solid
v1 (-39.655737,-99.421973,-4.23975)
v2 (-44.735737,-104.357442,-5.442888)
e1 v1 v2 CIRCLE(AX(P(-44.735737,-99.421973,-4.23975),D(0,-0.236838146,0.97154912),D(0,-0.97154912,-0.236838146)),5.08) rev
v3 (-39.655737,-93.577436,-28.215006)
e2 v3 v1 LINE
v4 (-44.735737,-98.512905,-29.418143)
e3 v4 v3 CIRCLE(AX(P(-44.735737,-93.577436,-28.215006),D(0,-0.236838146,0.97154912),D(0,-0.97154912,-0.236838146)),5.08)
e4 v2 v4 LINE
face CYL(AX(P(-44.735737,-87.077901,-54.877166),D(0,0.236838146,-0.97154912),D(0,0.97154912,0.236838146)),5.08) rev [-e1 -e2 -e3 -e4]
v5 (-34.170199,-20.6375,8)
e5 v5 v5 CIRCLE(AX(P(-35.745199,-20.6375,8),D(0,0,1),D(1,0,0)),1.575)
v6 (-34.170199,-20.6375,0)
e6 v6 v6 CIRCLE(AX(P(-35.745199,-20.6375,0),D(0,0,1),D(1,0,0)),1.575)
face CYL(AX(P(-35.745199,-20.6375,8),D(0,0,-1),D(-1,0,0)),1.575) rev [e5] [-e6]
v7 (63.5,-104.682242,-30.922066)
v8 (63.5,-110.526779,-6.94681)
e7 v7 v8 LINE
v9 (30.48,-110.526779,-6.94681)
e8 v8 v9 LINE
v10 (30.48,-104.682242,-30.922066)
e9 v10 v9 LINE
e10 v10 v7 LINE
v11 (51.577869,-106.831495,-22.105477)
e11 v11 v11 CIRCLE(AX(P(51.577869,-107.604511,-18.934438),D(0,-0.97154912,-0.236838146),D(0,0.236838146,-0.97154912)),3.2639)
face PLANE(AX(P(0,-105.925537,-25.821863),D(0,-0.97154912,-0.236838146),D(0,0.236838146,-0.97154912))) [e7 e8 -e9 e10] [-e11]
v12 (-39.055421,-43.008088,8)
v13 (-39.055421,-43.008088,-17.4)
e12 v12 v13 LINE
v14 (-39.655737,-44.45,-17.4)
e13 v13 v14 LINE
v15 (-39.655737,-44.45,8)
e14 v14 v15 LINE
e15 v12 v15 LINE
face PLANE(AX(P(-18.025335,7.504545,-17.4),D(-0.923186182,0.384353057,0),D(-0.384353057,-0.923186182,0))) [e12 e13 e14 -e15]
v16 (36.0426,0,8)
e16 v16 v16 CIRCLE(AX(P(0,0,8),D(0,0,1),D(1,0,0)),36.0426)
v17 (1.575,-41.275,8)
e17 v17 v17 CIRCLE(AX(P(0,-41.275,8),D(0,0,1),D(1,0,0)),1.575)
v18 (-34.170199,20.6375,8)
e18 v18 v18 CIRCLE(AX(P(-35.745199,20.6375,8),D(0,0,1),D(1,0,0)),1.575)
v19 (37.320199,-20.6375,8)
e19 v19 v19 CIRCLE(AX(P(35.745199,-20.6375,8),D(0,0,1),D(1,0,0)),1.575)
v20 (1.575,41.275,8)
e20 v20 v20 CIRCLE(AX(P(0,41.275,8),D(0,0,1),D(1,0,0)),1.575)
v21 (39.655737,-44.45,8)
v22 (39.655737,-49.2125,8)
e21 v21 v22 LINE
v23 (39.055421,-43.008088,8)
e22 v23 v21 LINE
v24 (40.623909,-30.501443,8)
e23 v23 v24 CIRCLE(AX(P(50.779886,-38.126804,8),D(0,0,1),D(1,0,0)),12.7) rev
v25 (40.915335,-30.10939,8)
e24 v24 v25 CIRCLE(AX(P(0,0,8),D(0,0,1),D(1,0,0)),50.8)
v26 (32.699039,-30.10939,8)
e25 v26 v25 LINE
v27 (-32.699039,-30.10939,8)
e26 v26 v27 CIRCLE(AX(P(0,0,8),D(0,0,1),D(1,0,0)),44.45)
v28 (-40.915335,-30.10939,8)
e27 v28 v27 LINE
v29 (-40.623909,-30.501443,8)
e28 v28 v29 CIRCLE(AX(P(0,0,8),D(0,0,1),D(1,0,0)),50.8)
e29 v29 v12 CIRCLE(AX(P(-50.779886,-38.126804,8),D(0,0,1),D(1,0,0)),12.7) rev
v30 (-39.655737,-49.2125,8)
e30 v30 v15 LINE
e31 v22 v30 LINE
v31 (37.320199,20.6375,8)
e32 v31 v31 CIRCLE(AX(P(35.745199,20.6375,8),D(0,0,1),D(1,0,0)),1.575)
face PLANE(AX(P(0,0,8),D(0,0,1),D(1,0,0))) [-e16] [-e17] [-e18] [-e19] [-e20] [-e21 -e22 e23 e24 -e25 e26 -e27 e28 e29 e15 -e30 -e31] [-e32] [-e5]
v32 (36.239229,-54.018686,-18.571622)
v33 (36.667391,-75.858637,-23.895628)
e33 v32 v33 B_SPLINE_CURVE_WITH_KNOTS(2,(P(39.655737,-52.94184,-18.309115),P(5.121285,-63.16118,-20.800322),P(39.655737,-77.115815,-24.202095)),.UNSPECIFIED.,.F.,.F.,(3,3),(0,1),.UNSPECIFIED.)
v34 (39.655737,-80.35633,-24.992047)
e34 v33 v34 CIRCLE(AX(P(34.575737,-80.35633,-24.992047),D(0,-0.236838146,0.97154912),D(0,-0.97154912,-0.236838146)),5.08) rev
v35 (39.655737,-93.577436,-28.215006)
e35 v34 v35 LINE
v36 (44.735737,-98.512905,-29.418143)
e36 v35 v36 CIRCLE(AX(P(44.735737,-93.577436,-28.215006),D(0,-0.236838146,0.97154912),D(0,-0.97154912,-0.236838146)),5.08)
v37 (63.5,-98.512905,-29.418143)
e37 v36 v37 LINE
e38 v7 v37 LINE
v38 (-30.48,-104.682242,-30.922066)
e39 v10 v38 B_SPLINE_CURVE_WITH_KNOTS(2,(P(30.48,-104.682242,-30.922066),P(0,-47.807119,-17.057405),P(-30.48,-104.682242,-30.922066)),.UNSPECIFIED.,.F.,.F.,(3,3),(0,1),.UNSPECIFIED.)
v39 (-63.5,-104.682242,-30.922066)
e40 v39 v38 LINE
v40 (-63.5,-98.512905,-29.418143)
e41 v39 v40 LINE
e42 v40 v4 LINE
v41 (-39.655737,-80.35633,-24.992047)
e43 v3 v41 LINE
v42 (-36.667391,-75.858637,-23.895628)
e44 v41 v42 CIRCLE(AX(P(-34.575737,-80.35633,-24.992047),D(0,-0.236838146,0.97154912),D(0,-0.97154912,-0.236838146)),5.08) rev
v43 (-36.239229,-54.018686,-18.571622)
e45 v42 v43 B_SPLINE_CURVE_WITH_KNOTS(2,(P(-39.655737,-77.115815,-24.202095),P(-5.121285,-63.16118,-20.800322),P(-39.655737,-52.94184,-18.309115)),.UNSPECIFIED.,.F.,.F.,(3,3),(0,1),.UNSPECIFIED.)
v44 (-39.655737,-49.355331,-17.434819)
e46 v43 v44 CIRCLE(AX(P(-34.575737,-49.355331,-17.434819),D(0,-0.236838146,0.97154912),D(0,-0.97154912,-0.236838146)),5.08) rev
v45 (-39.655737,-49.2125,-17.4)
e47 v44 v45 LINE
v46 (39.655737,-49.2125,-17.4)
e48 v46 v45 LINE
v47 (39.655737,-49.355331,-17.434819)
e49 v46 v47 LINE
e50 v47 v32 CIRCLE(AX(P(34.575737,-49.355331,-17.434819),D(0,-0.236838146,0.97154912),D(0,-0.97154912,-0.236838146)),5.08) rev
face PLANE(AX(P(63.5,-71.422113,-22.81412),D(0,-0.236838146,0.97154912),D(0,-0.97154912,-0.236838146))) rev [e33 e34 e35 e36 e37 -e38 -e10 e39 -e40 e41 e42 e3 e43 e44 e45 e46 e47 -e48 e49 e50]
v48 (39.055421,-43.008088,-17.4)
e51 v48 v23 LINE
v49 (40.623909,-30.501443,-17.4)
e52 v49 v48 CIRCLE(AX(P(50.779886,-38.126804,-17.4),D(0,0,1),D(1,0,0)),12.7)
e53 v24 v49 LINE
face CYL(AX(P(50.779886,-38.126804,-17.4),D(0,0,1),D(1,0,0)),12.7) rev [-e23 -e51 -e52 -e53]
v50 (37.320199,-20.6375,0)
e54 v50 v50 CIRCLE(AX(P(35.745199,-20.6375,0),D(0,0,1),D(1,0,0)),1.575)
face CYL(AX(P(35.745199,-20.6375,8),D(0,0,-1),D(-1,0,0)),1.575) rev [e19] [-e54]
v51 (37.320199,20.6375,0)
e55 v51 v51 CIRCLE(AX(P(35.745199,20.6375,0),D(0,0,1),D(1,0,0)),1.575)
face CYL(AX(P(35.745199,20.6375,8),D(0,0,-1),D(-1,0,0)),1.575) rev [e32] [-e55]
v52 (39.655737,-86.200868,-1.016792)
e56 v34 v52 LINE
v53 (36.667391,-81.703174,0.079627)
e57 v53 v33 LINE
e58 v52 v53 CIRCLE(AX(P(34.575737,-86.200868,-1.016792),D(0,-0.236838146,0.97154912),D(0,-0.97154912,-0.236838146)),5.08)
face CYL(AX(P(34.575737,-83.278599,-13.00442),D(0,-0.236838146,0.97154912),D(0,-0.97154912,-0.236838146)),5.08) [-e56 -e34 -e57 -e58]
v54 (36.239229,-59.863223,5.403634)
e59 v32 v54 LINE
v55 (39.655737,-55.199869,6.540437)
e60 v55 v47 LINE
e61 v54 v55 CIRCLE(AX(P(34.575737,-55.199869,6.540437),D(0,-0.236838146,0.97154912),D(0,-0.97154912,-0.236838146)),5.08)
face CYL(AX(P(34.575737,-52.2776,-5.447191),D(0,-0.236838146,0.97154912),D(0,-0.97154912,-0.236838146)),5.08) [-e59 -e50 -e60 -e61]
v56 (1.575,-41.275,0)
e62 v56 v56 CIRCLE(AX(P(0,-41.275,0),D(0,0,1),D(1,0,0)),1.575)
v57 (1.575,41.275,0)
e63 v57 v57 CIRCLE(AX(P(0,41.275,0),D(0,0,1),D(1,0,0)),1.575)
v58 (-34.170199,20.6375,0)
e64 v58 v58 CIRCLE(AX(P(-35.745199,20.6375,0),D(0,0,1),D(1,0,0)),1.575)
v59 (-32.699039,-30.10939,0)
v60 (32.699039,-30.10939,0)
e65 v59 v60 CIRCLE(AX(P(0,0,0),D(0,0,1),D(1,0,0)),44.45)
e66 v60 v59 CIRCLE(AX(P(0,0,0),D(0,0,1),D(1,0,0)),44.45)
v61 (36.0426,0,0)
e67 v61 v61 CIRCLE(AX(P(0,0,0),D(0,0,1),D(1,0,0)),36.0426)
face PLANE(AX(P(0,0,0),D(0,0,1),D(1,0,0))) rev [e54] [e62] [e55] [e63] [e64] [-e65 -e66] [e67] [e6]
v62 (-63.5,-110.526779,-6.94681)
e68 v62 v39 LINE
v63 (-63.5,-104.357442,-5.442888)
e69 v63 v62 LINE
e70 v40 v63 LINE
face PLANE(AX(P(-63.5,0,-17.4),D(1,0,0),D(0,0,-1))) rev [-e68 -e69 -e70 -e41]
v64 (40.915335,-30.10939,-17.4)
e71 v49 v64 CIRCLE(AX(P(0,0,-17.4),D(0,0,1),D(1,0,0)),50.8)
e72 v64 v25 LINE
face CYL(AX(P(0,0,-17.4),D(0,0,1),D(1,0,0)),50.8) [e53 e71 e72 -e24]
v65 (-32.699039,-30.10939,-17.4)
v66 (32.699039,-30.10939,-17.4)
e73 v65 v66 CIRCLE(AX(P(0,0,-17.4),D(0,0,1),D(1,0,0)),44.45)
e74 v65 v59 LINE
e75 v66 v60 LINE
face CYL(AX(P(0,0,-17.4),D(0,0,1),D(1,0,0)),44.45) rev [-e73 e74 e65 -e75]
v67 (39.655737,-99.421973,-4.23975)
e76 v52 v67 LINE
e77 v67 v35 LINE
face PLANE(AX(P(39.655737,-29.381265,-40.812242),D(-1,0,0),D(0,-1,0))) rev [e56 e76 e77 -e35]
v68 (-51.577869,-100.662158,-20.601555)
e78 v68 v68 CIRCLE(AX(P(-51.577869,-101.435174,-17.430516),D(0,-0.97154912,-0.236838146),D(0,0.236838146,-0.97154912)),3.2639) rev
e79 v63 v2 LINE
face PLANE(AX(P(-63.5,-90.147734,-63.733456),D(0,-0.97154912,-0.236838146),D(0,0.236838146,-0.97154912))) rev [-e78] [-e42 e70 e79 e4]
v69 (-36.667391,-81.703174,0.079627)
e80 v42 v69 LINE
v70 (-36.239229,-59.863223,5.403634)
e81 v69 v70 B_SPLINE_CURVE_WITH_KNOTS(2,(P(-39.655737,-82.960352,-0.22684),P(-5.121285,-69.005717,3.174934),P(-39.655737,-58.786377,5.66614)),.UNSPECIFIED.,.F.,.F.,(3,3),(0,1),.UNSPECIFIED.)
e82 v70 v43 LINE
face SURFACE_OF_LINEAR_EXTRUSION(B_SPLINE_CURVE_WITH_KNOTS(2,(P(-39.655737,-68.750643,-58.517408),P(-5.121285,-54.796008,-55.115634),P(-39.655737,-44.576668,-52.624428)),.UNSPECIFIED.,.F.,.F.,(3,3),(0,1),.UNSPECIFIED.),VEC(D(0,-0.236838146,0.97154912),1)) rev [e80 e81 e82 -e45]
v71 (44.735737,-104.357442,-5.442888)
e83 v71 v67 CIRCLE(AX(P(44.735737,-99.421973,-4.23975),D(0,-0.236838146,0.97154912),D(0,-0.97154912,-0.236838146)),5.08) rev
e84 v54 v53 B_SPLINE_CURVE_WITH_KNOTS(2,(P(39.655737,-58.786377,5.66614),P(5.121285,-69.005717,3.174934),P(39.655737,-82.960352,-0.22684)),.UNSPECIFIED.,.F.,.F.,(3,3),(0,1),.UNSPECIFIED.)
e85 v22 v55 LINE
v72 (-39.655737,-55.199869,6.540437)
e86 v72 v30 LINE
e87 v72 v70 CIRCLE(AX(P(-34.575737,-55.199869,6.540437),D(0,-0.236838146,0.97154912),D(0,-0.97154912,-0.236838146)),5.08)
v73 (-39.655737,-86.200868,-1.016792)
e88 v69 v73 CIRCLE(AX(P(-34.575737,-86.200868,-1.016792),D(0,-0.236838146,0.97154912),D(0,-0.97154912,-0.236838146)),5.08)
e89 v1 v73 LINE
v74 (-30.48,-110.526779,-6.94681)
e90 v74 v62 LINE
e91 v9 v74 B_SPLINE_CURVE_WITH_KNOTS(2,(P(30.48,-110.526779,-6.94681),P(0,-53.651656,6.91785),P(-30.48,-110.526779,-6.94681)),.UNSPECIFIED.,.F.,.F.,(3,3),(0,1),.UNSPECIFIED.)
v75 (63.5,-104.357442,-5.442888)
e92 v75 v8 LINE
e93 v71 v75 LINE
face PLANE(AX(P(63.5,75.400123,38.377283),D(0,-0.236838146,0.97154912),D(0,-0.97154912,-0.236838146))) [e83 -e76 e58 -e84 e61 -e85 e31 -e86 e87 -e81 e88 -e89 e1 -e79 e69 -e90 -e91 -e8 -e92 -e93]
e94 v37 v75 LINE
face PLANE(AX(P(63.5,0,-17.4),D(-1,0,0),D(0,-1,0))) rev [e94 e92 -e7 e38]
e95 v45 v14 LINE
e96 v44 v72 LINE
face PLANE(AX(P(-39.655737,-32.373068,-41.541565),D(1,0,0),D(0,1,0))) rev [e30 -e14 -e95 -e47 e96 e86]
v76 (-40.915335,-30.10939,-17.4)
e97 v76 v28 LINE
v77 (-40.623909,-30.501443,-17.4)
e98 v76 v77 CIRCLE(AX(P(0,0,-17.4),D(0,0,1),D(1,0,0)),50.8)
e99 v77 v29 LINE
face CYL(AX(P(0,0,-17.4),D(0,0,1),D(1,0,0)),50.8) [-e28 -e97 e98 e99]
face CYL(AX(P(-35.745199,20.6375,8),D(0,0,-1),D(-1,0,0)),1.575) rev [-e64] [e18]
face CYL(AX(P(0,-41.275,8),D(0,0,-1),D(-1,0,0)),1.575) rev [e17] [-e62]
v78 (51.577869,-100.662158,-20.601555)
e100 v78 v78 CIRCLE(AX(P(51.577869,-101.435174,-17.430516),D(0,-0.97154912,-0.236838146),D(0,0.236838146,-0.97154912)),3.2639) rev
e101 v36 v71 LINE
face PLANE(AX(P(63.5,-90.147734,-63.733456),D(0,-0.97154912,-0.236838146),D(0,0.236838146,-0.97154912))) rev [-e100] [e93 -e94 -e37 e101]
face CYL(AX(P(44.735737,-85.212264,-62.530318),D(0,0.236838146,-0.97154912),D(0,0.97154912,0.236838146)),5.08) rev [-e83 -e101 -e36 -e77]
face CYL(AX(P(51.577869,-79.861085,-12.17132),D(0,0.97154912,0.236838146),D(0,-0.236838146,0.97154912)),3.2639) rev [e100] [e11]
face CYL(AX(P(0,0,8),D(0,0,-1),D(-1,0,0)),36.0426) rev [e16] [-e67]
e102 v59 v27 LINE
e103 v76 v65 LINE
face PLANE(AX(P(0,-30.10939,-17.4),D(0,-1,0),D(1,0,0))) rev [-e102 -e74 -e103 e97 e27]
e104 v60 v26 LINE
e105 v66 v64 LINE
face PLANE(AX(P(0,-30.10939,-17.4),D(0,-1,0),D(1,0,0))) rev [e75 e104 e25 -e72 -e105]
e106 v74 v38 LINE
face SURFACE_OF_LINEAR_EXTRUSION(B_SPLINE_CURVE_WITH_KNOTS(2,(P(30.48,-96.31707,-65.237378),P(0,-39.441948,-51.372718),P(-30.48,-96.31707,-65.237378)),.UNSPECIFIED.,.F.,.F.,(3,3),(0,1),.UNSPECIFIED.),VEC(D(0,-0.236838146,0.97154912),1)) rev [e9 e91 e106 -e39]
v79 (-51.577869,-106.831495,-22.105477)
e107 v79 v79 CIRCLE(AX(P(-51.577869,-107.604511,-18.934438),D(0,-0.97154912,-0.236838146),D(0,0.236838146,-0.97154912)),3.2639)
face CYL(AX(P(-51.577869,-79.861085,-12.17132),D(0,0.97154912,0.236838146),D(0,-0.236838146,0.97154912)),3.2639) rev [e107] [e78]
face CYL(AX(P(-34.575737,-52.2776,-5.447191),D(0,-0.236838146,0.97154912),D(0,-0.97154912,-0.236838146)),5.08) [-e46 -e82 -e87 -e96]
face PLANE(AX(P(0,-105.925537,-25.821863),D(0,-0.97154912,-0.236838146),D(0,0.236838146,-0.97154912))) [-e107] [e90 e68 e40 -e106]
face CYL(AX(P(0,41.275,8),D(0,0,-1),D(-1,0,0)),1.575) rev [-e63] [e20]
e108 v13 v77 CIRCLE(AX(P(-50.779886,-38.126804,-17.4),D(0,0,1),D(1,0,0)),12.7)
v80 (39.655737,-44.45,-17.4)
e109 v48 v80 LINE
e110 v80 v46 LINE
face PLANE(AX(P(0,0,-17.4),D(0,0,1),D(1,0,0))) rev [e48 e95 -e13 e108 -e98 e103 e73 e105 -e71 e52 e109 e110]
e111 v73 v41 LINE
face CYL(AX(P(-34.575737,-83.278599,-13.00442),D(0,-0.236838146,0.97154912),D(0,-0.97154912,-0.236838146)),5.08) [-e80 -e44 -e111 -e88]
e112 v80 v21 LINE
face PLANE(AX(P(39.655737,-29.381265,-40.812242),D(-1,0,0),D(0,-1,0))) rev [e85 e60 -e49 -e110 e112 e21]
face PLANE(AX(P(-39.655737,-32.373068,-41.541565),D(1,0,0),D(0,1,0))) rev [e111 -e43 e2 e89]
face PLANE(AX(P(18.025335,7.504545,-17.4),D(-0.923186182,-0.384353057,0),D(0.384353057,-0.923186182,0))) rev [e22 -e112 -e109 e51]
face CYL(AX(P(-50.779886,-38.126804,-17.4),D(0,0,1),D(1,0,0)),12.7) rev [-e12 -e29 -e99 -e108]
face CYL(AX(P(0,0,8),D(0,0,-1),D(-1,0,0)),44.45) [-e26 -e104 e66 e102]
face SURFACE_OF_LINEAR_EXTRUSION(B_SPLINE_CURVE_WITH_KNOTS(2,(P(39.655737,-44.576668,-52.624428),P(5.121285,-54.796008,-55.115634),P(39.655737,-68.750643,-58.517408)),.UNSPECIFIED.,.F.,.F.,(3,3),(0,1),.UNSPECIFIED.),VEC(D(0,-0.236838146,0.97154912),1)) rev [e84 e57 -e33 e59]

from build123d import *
from build123d.topology import SkipClean

# Parameters (mm, degrees)
SKETCH1_R                       = 44.45
SKETCH1_R_2                     = 36.0426
SKETCH1_R_3                     = 1.575
BOSS_EXTRUDE1_DEPTH             = 8
BOSS_EXTRUDE2_START             = -25.4
BOSS_EXTRUDE2_DEPTH             = 25.4
SKETCH5_W                       = 127
SKETCH5_H                       = 24.677347648
BOSS_EXTRUDE3_DEPTH             = 22.86
BOSS_EXTRUDE3_DIRECTION_2_REACH = 117.98
CUT_EXTRUDE1_DEPTH              = 103.517532245
CUT_EXTRUDE2_DEPTH              = 106.121352295
SKETCH8_R                       = 3.2639
CUT_EXTRUDE3_DEPTH              = 132.797554186
SKETCH10_W                      = 23.84426271
SKETCH10_H                      = 24.677347648
SKETCH10_R                      = 3.2639
BOSS_EXTRUDE4_DEPTH             = 34.23412
FILLET3_START                   = -19.427790223
FILLET3_DEPTH                   = 24.677347648
FILLET4_R                       = 12.7
SKETCH11_W                      = 23.84426271
SKETCH11_H                      = 32.29864
CUT_EXTRUDE4_DEPTH              = 134.162391299
BOSS_EXTRUDE5_DEPTH             = 24.677347648
FILLET5_R                       = 5.08
CUT_EXTRUDE5_DEPTH              = 134.162391299
CUT_EXTRUDE6_DEPTH              = 134.162391464
FILLET6_START                   = -20
FILLET6_DEPTH                   = 26.377499095


with BuildPart() as part:
    # Sketch1 → Boss-Extrude1 (new body)
    with BuildSketch(Plane.XY):
        Circle(SKETCH1_R)
        Circle(SKETCH1_R_2, mode=Mode.SUBTRACT)
        with Locations((35.745198541, 20.6375)):
            Circle(SKETCH1_R_3, mode=Mode.SUBTRACT)
        with Locations((0, 41.275)):
            Circle(SKETCH1_R_3, mode=Mode.SUBTRACT)
        with Locations((-35.745198541, 20.6375)):
            Circle(SKETCH1_R_3, mode=Mode.SUBTRACT)
        with Locations((-35.745198541, -20.6375)):
            Circle(SKETCH1_R_3, mode=Mode.SUBTRACT)
        with Locations((0, -41.275)):
            Circle(SKETCH1_R_3, mode=Mode.SUBTRACT)
        with Locations((35.745198541, -20.6375)):
            Circle(SKETCH1_R_3, mode=Mode.SUBTRACT)
    extrude(amount=BOSS_EXTRUDE1_DEPTH)

    # Sketch4 → Boss-Extrude2 (add)
    with BuildSketch(Plane.XY.offset(8).offset(BOSS_EXTRUDE2_START)):
        with BuildLine():
            Line((-39.65573729, -44.45), (-63.5, -44.45))
            Line((-63.5, -44.45), (-63.5, -49.2125))
            Line((-63.5, -49.2125), (63.5, -49.2125))
            Line((63.5, -49.2125), (63.5, -44.45))
            Line((63.5, -44.45), (39.65573729, -44.45))
            Line((39.65573729, -44.45), (36.050670263, -35.790909091))
            ThreePointArc((36.050670263, -35.790909091), (38.587710733, -33.039802972), (40.915335308, -30.10938951))
            Line((40.915335308, -30.10938951), (32.699039181, -30.10938951))
            ThreePointArc((32.699039181, -30.10938951), (0, -44.45), (-32.699039181, -30.10938951))
            Line((-32.699039181, -30.10938951), (-40.915335308, -30.10938951))
            ThreePointArc((-40.915335308, -30.10938951), (-38.587710733, -33.039802972), (-36.050670263, -35.790909091))
            Line((-36.050670263, -35.790909091), (-39.65573729, -44.45))
        make_face()
    extrude(amount=BOSS_EXTRUDE2_DEPTH)

    # Sketch5 → Boss-Extrude3 (add)
    with BuildSketch(Plane(origin=(0, -50.455795448, -12.299797104), x_dir=(-1, 0, 0), z_dir=(0, -0.971549119997646, -0.2368381460656192))):
        with Locations((0, -7.089116399)):
            Rectangle(SKETCH5_W, SKETCH5_H)
    extrude(amount=BOSS_EXTRUDE3_DEPTH)

    # Boss-Extrude3 direction 2: up to this face of the body (flat: up to its plane)
    boss_extrude3_direction_2_end = Plane(part.part.faces().sort_by_distance((0, -49.2125, -4.7))[0])
    # Sketch5 → Boss-Extrude3 direction 2 (add, up to the picked face)
    with BuildSketch(Plane(origin=(0, -50.455795448, -12.299797104), x_dir=(-1, 0, 0), z_dir=(0, -0.971549119997646, -0.2368381460656192)), mode=Mode.PRIVATE) as boss_extrude3_direction_2_sk1:
        with Locations((0, -7.089116399)):
            Rectangle(SKETCH5_W, SKETCH5_H)
    boss_extrude3_direction_2_tool1 = split(extrude(boss_extrude3_direction_2_sk1.sketch, amount=-BOSS_EXTRUDE3_DIRECTION_2_REACH, mode=Mode.PRIVATE), bisect_by=boss_extrude3_direction_2_end, keep=Keep.BOTH, mode=Mode.PRIVATE)
    add(boss_extrude3_direction_2_tool1.solids().sort_by(Axis((0, -52.134769, -5.412372), (0, 0.971549119997646, 0.2368381460656192)))[0])

    # Sketch6 → Cut-Extrude1 (cut, through all)
    with BuildSketch(Plane(origin=(0, 1.243295448, -5.100202896), x_dir=(-1, 0, 0), z_dir=(0, 0.23683814606561915, -0.971549119997646))):
        with BuildLine():
            Line((-39.65573729, -74.793344809), (-39.65573729, -84.912644386))
            Line((-39.65573729, -84.912644386), (39.65573729, -84.912644386))
            Line((39.65573729, -84.912644386), (39.65573729, -74.793344809))
            add(Edge.make_bspline(
                [(-39.65573729, -74.793344809), (0, -52.373165884), (39.65573729, -74.793344809)],
                knots=[0, 0, 0, 1, 1, 1], degree=2))
        make_face()
    extrude(amount=-CUT_EXTRUDE1_DEPTH, mode=Mode.SUBTRACT)

    # Sketch7 → Cut-Extrude2 (cut, through all)
    with BuildSketch(Plane(origin=(0, -4.601241819, 18.875052495), x_dir=(1, 0, 0), z_dir=(0, -0.23683814606561915, 0.971549119997646))):
        Polygon((-39.65573729, -41.290653215), (-39.65573729, -70.378824809), (-63.5, -70.378824809), (-63.5, -38.21123826), (-39.65573729, -38.21123826), align=None)
        Polygon((39.65573729, -70.378824809), (63.5, -70.378824809), (63.5, -38.21123826), (39.65573729, -38.21123826), (39.65573729, -41.290653215), align=None)
    extrude(amount=-CUT_EXTRUDE2_DEPTH, mode=Mode.SUBTRACT)

    # Sketch8 → Cut-Extrude3 (cut, through all)
    with BuildSketch(Plane(origin=(0, -68.37648531, -16.66839039), x_dir=(1, 0, 0), z_dir=(0, 0.971549119997646, 0.2368381460656191))):
        with Locations(Location((51.577868645, -7.089116399, 0), (0, 0, 270))):
            Circle(SKETCH8_R)
        with Locations(Location((-51.577868645, -7.089116399, 0), (0, 0, 270))):
            Circle(SKETCH8_R)
    extrude(amount=-CUT_EXTRUDE3_DEPTH, mode=Mode.SUBTRACT)

    # Sketch10 → Boss-Extrude4 (add)
    # profile 1 of 2: a face of its own
    with SkipClean():  # the faces are left unmerged after this step: merging them gives an invalid solid
        with BuildSketch(Plane(origin=(0, -72.665408331, -17.713917123), x_dir=(1, 0, 0), z_dir=(0, -0.9715491199976461, -0.23683814606561926))):
            with Locations((-51.577868645, 7.089116399)):
                Rectangle(SKETCH10_W, SKETCH10_H)
            with Locations(Location((-51.577868645, 7.089116399, 0), (0, 0, 270))):
                Circle(SKETCH10_R, mode=Mode.SUBTRACT)
        # profile 2 of 2: a face of its own
        with BuildSketch(Plane(origin=(0, -72.665408331, -17.713917123), x_dir=(1, 0, 0), z_dir=(0, -0.9715491199976461, -0.23683814606561926))):
            with Locations((51.577868645, 7.089116399)):
                Rectangle(SKETCH10_W, SKETCH10_H)
            with Locations(Location((51.577868645, 7.089116399, 0), (0, 0, 90))):
                Circle(SKETCH10_R, mode=Mode.SUBTRACT)
        extrude(amount=BOSS_EXTRUDE4_DEPTH)
    add(part.part.scale(1), mode=Mode.REPLACE)  # the faces are merged on a copy

    # Fillet3: read off the stored shape, not the designer's step
    # Fillet3 outline → Fillet3 (add)
    with SkipClean():  # the faces are left unmerged after this step: merging them gives an invalid solid
        with BuildSketch(Plane(origin=(0, 0, 0), x_dir=(1, 0, 0), z_dir=(0, 0.23683814606561904, -0.9715491199976461)).offset(FILLET3_START)):
            with BuildLine():
                ThreePointArc((0, 75.867019335), (-23.207224812, 88.40595558), (-39.65573729, 109.027464809))
                Line((-39.65573729, 109.027464809), (-39.65573729, 74.793344809))
                add(Edge.make_bspline(
                    [(39.65573729, 74.793344809), (0, 52.373165884), (-39.65573729, 74.793344809)],
                    knots=[0, 0, 0, 1, 1, 1], degree=2))
                Line((39.65573729, 74.793344809), (39.65573729, 109.027464809))
                ThreePointArc((39.65573729, 109.027464809), (23.207224812, 88.40595558), (0, 75.867019335))
            make_face()
        extrude(amount=FILLET3_DEPTH)

    # Fillet4
    fillet4_edges = [part.edges().sort_by_distance(p)[0] for p in [
        (36.050670263, -35.790909091, -4.7),
        (-36.050670263, -35.790909091, -4.7),
    ]]
    fillet(fillet4_edges, radius=FILLET4_R)

    # Sketch11 → Cut-Extrude4 (cut, through all)
    with BuildSketch(Plane(origin=(0, -4.601241819, 18.875052495), x_dir=(1, 0, 0), z_dir=(0, -0.2368381460656192, 0.9715491199976461))):
        with Locations((-51.577868645, -86.528144809)):
            Rectangle(SKETCH11_W, SKETCH11_H)
        with Locations((51.577868645, -86.528144809)):
            Rectangle(SKETCH11_W, SKETCH11_H)
    extrude(amount=-CUT_EXTRUDE4_DEPTH, mode=Mode.SUBTRACT)

    # Sketch12 → Boss-Extrude5 (add)
    with BuildSketch(Plane(origin=(0, -4.601241819, 18.875052495), x_dir=(1, 0, 0), z_dir=(0, -0.2368381460656192, 0.9715491199976461))):
        Polygon((-39.65573729, -109.027464809), (39.65573729, -109.027464809), (30.485915065, -74.825591671), (-33.624171028, -74.825591671), align=None)
    extrude(amount=-BOSS_EXTRUDE5_DEPTH)

    # Fillet5
    fillet5_edges = [part.edges().sort_by_distance(p)[0] for p in [
        (-39.65573729, -101.435173764, -17.430515609),
        (39.65573729, -101.435173764, -17.430515609),
    ]]
    fillet(fillet5_edges, radius=FILLET5_R)

    # Sketch13 → Cut-Extrude5 (cut, through all)
    with BuildSketch(Plane(origin=(0, -4.601241819, 18.875052495), x_dir=(1, 0, 0), z_dir=(0, -0.2368381460656192, 0.9715491199976461))):
        with BuildLine():
            Line((-30.48, -109.027464809), (-30.48, -117.81515038))
            Line((-30.48, -117.81515038), (30.48, -117.81515038))
            Line((30.48, -117.81515038), (30.48, -109.027464809))
            add(Edge.make_bspline(
                [(-30.48, -109.027464809), (0, -50.4868087), (30.48, -109.027464809)],
                knots=[0, 0, 0, 1, 1, 1], degree=2))
        make_face()
    extrude(amount=-CUT_EXTRUDE5_DEPTH, mode=Mode.SUBTRACT)

    # Sketch14 → Cut-Extrude6 (cut, through all)
    with BuildSketch(Plane(origin=(0, -4.601241819, 18.875052495), x_dir=(1, 0, 0), z_dir=(0, -0.2368381460656192, 0.9715491199976461))):
        with BuildLine():
            Line((-39.65573729, -55.771894755), (-39.65573729, -80.653781316))
            add(Edge.make_bspline(
                [(-39.65573729, -55.771894755), (-5.12128529, -66.290498293), (-39.65573729, -80.653781316)],
                knots=[0, 0, 0, 1, 1, 1], degree=2))
        make_face()
        with BuildLine():
            Line((39.65573729, -80.653781316), (39.65573729, -55.771894755))
            add(Edge.make_bspline(
                [(39.65573729, -55.771894755), (5.12128529, -66.290498293), (39.65573729, -80.653781316)],
                knots=[0, 0, 0, 1, 1, 1], degree=2))
        make_face()
    extrude(amount=-CUT_EXTRUDE6_DEPTH, mode=Mode.SUBTRACT)

    # Fillet6: read off the stored shape, not the designer's step
    # Fillet6 outline → Fillet6 (cut)
    with BuildSketch(Plane(origin=(0, 0, 0), x_dir=(1, 0, 0), z_dir=(0, 0.23683814606561904, -0.9715491199976461)).offset(FILLET6_START)):
        with BuildLine():
            Line((-39.65573729, 55.771894755), (-39.65573729, 52.0803589))
            ThreePointArc((-39.65573729, 52.0803589), (-38.714392857, 55.026191566), (-36.239229378, 56.880274949))
            add(Edge.make_bspline(
                [(-36.239229378, 56.880274949), (-37.853422524, 56.320849013), (-39.65573729, 55.771894755)],
                knots=[0.947811109, 0.947811109, 0.947811109, 1, 1, 1], degree=2))
        make_face()
        with BuildLine():
            add(Edge.make_bspline(
                [(-39.65573729, 80.653781316), (-38.090633643, 80.00283638), (-36.667391198, 79.359788064)],
                knots=[0, 0, 0, 0.045320066, 0.045320066, 0.045320066], degree=2))
            ThreePointArc((-36.667391198, 79.359788064), (-38.843758017, 81.234124448), (-39.65573729, 83.989192337))
            Line((-39.65573729, 83.989192337), (-39.65573729, 80.653781316))
        make_face()
        with BuildLine():
            add(Edge.make_bspline(
                [(39.65573729, 55.771894755), (37.853422524, 56.320849013), (36.239229378, 56.880274949)],
                knots=[0, 0, 0, 0.052188891, 0.052188891, 0.052188891], degree=2))
            ThreePointArc((36.239229378, 56.880274949), (38.714392857, 55.026191566), (39.65573729, 52.0803589))
            Line((39.65573729, 52.0803589), (39.65573729, 55.771894755))
        make_face()
        with BuildLine():
            ThreePointArc((39.65573729, 83.989192337), (38.843758017, 81.234124448), (36.667391198, 79.359788064))
            add(Edge.make_bspline(
                [(36.667391198, 79.359788064), (38.090633643, 80.00283638), (39.65573729, 80.653781316)],
                knots=[0.954679934, 0.954679934, 0.954679934, 1, 1, 1], degree=2))
            Line((39.65573729, 80.653781316), (39.65573729, 83.989192337))
        make_face()
    extrude(amount=FILLET6_DEPTH, mode=Mode.SUBTRACT)


solid = part.part
